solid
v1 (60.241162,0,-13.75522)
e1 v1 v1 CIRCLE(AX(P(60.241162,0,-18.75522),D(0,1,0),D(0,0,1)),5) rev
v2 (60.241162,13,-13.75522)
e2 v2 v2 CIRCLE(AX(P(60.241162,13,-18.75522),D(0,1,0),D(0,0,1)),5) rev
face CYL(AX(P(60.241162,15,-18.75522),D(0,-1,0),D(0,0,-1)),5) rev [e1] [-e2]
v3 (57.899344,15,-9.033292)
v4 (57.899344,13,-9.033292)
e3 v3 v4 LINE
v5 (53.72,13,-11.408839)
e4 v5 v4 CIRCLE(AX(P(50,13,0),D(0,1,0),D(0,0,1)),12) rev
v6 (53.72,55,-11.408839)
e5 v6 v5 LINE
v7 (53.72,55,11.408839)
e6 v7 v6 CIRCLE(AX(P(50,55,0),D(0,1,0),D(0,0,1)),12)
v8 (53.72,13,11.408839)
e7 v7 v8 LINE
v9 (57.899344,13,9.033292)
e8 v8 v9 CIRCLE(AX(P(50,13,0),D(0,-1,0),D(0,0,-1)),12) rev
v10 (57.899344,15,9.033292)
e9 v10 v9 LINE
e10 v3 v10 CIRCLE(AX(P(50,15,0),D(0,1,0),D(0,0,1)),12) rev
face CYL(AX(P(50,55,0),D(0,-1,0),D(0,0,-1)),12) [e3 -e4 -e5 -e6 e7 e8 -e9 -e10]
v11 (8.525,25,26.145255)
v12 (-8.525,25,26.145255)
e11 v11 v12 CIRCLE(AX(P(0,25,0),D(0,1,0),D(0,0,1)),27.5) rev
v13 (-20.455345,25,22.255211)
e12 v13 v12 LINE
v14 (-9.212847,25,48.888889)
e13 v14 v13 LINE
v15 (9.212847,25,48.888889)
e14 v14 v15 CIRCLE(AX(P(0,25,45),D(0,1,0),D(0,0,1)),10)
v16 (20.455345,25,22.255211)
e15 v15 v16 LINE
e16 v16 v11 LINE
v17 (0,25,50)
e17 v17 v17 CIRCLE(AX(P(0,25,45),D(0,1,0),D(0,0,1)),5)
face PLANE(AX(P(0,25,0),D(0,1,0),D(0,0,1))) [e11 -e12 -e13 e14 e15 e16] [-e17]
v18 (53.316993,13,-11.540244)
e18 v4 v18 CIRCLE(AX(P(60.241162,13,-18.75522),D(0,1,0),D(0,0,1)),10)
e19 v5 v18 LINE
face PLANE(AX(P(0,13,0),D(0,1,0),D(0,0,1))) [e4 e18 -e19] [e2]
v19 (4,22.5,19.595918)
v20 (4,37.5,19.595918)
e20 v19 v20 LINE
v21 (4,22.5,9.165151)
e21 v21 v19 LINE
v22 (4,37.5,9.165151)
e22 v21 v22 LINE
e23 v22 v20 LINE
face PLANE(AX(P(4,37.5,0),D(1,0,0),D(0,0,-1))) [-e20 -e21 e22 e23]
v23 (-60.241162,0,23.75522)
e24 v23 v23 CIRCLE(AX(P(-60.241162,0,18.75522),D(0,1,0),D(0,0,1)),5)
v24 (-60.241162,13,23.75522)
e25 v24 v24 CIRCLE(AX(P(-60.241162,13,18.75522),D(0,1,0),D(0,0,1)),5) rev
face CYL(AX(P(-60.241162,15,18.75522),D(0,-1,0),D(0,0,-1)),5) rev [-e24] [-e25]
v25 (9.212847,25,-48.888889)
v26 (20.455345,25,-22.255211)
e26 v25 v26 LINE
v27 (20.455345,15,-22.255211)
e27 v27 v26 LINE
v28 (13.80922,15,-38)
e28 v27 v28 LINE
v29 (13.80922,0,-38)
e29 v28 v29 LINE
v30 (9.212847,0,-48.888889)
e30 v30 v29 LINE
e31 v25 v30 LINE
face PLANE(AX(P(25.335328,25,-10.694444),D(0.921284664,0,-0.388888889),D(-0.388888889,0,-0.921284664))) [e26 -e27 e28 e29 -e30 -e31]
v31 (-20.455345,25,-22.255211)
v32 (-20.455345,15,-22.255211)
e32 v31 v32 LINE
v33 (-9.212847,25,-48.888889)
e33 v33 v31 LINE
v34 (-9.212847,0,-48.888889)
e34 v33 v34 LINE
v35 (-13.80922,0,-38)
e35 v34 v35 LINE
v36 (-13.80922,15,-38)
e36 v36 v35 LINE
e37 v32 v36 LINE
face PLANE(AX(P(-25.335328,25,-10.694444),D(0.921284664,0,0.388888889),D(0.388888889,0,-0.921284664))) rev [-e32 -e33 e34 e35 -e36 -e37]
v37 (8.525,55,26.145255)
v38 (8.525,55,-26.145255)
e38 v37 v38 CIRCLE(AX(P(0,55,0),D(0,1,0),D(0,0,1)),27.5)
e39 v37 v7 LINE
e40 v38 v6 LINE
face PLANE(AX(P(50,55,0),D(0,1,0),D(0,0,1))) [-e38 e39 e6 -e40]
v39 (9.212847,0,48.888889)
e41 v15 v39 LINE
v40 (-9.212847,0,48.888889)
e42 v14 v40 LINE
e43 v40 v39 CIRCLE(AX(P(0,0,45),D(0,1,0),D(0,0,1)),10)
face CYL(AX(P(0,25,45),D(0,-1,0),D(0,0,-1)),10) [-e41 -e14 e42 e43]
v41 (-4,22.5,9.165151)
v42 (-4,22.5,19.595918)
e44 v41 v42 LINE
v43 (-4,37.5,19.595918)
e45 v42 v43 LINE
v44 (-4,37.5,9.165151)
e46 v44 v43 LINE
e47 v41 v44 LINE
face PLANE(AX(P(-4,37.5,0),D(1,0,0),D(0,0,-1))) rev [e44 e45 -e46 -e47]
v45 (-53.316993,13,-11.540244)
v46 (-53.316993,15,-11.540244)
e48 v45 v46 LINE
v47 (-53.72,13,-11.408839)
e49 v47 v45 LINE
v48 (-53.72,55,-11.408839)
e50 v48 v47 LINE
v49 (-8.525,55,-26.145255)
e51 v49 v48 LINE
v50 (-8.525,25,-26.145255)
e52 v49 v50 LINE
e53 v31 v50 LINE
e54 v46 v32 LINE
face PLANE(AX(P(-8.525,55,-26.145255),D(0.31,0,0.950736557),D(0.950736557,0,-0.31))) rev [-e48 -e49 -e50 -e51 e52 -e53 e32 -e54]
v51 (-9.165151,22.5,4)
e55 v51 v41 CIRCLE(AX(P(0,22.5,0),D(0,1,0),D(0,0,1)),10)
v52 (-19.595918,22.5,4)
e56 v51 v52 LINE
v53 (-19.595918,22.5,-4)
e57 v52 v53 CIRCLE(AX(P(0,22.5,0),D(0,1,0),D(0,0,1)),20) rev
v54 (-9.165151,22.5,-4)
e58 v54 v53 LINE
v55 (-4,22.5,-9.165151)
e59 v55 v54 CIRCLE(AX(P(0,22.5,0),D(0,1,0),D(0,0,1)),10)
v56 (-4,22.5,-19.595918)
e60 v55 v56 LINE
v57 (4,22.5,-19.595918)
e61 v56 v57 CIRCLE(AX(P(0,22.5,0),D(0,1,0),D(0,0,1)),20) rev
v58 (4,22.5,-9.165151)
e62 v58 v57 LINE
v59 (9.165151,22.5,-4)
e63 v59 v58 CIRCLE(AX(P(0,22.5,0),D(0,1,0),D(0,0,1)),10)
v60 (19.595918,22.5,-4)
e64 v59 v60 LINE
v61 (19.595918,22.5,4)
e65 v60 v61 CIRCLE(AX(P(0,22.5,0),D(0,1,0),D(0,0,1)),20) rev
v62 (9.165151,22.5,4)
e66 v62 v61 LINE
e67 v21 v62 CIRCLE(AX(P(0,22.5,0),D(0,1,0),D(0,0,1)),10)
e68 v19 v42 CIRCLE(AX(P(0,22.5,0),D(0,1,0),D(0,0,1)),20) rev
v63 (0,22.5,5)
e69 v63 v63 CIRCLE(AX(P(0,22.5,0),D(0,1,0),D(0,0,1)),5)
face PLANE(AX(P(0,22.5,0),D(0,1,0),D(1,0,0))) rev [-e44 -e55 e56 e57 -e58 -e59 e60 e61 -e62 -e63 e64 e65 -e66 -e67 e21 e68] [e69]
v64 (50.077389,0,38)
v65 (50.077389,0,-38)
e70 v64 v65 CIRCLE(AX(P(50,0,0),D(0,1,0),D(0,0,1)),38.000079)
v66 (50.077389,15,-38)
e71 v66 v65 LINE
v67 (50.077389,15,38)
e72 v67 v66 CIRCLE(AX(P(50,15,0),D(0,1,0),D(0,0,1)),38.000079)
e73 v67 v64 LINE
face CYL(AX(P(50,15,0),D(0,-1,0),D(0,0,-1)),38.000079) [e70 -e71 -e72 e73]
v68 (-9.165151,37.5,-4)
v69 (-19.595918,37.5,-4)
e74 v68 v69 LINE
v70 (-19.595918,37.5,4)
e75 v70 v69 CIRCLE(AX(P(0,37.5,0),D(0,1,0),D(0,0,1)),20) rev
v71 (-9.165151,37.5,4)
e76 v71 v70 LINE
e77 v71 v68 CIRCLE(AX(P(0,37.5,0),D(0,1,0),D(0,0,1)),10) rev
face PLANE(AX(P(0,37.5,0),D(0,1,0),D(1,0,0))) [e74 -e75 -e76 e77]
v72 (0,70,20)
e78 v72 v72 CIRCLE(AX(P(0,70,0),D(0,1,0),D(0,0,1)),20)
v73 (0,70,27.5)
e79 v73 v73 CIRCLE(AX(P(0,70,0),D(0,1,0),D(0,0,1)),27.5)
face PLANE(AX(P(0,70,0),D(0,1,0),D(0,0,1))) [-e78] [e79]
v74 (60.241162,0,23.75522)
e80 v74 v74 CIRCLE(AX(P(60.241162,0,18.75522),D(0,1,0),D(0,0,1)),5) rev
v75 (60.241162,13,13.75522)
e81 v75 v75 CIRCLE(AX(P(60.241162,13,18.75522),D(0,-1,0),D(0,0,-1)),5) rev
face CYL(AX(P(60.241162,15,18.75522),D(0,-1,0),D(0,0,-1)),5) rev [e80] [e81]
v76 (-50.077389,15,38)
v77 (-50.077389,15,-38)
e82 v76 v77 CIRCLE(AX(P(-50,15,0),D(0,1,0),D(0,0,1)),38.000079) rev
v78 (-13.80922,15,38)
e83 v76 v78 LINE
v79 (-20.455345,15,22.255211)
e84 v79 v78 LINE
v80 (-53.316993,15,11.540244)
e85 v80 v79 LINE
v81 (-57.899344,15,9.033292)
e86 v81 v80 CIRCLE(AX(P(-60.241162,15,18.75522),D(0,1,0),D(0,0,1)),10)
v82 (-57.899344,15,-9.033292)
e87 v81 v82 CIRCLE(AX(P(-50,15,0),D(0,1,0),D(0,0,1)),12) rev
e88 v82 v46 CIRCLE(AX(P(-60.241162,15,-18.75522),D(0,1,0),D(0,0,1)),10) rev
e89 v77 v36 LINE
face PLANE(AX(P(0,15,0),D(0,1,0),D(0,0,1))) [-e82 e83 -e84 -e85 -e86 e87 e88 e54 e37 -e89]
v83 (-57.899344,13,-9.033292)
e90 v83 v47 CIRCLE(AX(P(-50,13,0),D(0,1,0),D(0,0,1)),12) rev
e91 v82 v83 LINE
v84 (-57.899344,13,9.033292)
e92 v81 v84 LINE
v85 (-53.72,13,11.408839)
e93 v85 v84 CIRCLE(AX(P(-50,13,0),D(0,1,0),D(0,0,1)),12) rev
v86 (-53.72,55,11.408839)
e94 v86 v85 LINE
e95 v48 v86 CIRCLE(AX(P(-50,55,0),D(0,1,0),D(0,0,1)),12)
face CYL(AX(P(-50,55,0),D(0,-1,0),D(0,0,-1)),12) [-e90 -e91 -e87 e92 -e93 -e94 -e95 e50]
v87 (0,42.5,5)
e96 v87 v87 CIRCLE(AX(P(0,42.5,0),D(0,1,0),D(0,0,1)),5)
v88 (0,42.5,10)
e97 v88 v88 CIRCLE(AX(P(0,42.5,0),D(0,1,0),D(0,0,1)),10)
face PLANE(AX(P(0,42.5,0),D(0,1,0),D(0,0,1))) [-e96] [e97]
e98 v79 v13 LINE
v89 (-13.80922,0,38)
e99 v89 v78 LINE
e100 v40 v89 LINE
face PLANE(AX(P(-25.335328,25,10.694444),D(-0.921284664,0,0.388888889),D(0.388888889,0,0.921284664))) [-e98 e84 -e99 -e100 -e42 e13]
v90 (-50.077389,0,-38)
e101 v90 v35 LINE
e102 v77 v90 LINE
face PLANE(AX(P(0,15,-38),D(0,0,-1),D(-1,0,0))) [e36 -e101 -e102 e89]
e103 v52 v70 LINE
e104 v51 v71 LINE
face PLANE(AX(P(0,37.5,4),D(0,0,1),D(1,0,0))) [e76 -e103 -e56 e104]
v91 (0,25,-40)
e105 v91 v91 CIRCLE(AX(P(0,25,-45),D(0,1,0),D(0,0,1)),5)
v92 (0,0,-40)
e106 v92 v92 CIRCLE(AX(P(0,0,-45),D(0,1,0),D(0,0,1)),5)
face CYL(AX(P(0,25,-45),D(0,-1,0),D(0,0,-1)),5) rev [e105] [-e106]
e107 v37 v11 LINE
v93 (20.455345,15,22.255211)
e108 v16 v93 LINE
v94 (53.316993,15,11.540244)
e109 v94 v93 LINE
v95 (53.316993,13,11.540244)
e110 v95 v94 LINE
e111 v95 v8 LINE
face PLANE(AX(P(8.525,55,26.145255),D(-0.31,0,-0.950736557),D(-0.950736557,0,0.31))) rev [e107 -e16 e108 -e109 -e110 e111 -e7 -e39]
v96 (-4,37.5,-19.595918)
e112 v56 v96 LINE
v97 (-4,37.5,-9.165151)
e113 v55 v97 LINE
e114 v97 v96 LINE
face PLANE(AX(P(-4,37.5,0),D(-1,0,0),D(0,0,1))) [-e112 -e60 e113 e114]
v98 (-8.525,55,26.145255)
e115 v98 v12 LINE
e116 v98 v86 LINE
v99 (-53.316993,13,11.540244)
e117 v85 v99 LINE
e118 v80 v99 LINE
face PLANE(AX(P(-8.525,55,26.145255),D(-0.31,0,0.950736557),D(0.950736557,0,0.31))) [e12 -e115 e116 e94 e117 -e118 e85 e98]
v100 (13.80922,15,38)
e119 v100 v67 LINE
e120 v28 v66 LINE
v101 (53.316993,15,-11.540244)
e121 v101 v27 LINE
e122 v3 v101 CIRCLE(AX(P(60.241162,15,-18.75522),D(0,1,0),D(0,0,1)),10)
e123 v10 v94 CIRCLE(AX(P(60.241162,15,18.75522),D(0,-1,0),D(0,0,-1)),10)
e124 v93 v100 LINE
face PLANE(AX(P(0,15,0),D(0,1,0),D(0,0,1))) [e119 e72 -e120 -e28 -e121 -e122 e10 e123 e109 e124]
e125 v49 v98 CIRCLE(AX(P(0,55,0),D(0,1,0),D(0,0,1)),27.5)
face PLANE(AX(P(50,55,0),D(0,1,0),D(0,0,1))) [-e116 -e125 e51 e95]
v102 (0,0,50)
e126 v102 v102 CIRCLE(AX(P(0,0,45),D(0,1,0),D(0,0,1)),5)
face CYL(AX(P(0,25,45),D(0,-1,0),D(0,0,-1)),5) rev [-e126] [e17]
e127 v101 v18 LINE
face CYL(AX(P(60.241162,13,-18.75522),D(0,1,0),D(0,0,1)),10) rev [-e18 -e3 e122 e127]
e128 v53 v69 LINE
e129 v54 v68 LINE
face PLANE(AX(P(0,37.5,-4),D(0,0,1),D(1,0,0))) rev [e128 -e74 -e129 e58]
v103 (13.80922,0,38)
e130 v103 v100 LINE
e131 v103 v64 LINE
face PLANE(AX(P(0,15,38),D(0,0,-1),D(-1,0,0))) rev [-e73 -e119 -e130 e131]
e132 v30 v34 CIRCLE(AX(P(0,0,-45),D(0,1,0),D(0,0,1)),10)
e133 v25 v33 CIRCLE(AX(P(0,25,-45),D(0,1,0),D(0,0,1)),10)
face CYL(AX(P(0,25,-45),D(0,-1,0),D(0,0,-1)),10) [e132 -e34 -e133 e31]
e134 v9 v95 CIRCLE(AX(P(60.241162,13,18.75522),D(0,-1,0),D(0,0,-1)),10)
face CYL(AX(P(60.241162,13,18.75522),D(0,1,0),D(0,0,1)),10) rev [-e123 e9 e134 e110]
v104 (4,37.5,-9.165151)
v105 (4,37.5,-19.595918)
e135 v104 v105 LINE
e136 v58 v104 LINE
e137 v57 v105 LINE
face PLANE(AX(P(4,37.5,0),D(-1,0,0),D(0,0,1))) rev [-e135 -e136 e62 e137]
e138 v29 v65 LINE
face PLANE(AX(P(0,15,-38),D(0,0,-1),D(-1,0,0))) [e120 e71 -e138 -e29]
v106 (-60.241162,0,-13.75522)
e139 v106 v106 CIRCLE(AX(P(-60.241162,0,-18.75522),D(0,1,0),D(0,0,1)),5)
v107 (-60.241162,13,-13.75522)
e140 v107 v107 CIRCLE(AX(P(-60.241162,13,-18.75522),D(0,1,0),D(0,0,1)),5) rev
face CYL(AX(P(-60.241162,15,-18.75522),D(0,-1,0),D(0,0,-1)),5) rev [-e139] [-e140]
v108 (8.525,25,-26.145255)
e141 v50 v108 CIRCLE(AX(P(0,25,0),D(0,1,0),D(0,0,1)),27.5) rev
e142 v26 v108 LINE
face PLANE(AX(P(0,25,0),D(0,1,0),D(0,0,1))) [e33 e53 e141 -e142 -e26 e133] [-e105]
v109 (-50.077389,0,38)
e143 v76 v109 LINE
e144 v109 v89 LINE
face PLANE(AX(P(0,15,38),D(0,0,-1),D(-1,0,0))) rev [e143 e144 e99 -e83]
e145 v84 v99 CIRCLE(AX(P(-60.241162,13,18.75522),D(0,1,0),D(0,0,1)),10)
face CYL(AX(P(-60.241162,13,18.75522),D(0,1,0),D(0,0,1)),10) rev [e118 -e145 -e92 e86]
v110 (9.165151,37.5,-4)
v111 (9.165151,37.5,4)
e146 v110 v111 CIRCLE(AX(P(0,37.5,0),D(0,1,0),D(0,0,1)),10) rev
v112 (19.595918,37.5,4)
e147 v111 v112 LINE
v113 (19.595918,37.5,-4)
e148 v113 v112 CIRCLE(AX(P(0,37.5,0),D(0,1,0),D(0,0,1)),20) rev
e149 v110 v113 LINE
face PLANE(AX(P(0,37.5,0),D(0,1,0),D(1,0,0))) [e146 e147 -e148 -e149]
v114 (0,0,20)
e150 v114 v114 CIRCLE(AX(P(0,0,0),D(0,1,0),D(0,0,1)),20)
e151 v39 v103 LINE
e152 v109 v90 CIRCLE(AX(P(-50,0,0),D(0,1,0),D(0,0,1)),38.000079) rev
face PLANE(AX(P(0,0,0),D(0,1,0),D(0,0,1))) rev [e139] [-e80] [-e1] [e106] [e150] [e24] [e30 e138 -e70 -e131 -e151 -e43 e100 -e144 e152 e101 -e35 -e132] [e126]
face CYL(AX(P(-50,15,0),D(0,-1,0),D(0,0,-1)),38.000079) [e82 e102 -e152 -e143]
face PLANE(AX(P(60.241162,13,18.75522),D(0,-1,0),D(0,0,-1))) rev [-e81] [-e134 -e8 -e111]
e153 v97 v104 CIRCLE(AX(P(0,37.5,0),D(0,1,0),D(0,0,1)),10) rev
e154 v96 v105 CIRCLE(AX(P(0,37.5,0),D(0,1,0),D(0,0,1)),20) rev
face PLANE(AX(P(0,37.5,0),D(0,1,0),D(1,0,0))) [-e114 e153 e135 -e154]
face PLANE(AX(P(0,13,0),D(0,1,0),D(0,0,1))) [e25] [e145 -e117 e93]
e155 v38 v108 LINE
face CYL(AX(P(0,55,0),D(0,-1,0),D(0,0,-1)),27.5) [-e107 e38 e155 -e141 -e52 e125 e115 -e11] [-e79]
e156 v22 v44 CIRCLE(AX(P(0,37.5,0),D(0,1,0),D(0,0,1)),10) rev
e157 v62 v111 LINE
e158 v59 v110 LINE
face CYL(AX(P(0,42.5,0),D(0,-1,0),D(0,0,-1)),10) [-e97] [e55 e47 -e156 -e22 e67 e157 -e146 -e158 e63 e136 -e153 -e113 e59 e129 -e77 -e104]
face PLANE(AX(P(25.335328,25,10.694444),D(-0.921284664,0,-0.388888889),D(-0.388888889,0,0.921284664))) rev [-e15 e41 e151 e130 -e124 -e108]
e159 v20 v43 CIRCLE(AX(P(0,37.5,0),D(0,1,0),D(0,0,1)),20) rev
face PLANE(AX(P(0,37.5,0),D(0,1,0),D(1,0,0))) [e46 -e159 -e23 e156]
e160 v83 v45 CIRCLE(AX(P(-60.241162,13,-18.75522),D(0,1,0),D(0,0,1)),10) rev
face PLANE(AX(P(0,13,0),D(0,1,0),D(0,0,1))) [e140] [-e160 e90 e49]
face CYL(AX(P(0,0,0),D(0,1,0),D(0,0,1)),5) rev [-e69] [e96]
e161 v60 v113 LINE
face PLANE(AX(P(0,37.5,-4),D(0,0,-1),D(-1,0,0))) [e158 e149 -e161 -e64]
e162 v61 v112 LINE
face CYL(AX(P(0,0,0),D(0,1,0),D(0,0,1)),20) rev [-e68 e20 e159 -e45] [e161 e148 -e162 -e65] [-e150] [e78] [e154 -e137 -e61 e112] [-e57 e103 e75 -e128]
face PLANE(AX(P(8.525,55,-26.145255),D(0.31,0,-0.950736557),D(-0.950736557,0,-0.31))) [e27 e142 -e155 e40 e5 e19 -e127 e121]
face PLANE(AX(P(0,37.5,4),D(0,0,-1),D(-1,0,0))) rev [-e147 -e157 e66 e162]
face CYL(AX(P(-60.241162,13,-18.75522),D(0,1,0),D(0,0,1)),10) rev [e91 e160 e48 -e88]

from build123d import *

# Parameters (mm, degrees)
SKETCH1_R           = 5
BOSS_EXTRUDE2_DEPTH = 15
CUT_EXTRUDE1_START  = -2
SKETCH2_R           = 10
SKETCH2_R_2         = 5
CUT_EXTRUDE1_DEPTH  = 2
BOSS_EXTRUDE3_START = -15
SKETCH3_R           = 5
BOSS_EXTRUDE3_DEPTH = 25
BOSS_EXTRUDE4_DEPTH = 55
SKETCH5_R           = 27.5
BOSS_EXTRUDE5_DEPTH = 15
SKETCH6_R           = 20
CUT_EXTRUDE2_DEPTH  = 126.175931669
EXTRUDE_THIN1_START = 22.5
EXTRUDE_THIN1_DEPTH = 15
BOSS_EXTRUDE6_START = -15
SKETCH8_R           = 10
BOSS_EXTRUDE6_DEPTH = 20
SKETCH9_R           = 5
CUT_EXTRUDE3_DEPTH  = 113.139483989


with BuildPart() as part:
    # Sketch1 → Boss-Extrude2 (new body)
    with BuildSketch(Plane(origin=(0, 0, 0), x_dir=(1, 0, 0), z_dir=(0, 1, 0))):
        with BuildLine():
            Line((-50.077388597, -38), (50.077388597, -38))
            ThreePointArc((50.077388597, -38), (88.000078802, 0), (50.077388597, 38))
            Line((50.077388597, 38), (-50.077388597, 38))
            ThreePointArc((-50.077388597, 38), (-88.000078802, 0), (-50.077388597, -38))
        make_face()
        with Locations(Location((-60.241162363, 18.755220238, 0), (0, 0, 270))):
            Circle(SKETCH1_R, mode=Mode.SUBTRACT)
        with Locations(Location((-60.241162363, -18.755220238, 0), (0, 0, 270))):
            Circle(SKETCH1_R, mode=Mode.SUBTRACT)
        with Locations(Location((60.241162363, -18.755220238, 0), (0, 0, 270))):
            Circle(SKETCH1_R, mode=Mode.SUBTRACT)
        with Locations(Location((60.241162363, 18.755220238, 0), (0, 0, 270))):
            Circle(SKETCH1_R, mode=Mode.SUBTRACT)
    extrude(amount=BOSS_EXTRUDE2_DEPTH)

    # Sketch2 → Cut-Extrude1 (cut)
    # profile 1 of 4: a face of its own
    with BuildSketch(Plane(origin=(0, 15, 0), x_dir=(1, 0, 0), z_dir=(0, 1, 0)).offset(CUT_EXTRUDE1_START)):
        with Locations(Location((-60.241162363, -18.755220238, 0), (0, 0, 270))):
            Circle(SKETCH2_R)
        with Locations(Location((-60.241162363, -18.755220238, 0), (0, 0, 270))):
            Circle(SKETCH2_R_2, mode=Mode.SUBTRACT)
    # profile 2 of 4: a face of its own
    with BuildSketch(Plane(origin=(0, 15, 0), x_dir=(1, 0, 0), z_dir=(0, 1, 0)).offset(CUT_EXTRUDE1_START)):
        with Locations(Location((-60.241162363, 18.755220238, 0), (0, 0, 270))):
            Circle(SKETCH2_R)
        with Locations(Location((-60.241162363, 18.755220238, 0), (0, 0, 270))):
            Circle(SKETCH2_R_2, mode=Mode.SUBTRACT)
    # profile 3 of 4: a face of its own
    with BuildSketch(Plane(origin=(0, 15, 0), x_dir=(1, 0, 0), z_dir=(0, 1, 0)).offset(CUT_EXTRUDE1_START)):
        with Locations(Location((60.241162363, 18.755220238, 0), (0, 0, 270))):
            Circle(SKETCH2_R)
        with Locations(Location((60.241162363, 18.755220238, 0), (0, 0, 270))):
            Circle(SKETCH2_R_2, mode=Mode.SUBTRACT)
    # profile 4 of 4: a face of its own
    with BuildSketch(Plane(origin=(0, 15, 0), x_dir=(1, 0, 0), z_dir=(0, 1, 0)).offset(CUT_EXTRUDE1_START)):
        with Locations(Location((60.241162363, -18.755220238, 0), (0, 0, 90))):
            Circle(SKETCH2_R)
    extrude(amount=CUT_EXTRUDE1_DEPTH, mode=Mode.SUBTRACT)

    # Sketch3 → Boss-Extrude3 (add)
    with BuildSketch(Plane(origin=(0, 15, 0), x_dir=(1, 0, 0), z_dir=(0, 1, 0)).offset(BOSS_EXTRUDE3_START)):
        with BuildLine():
            Line((-9.21284664, 48.888888889), (-25.33532826, 10.694444444))
            ThreePointArc((-25.33532826, 10.694444444), (-27.5, 0), (-25.33532826, -10.694444444))
            Line((-25.33532826, -10.694444444), (-9.21284664, -48.888888889))
            ThreePointArc((-9.21284664, -48.888888889), (0, -55), (9.21284664, -48.888888889))
            Line((9.21284664, -48.888888889), (25.33532826, -10.694444444))
            ThreePointArc((25.33532826, -10.694444444), (27.5, 0), (25.33532826, 10.694444444))
            Line((25.33532826, 10.694444444), (9.21284664, 48.888888889))
            ThreePointArc((9.21284664, 48.888888889), (0, 55), (-9.21284664, 48.888888889))
        make_face()
        with Locations(Location((0, 45, 0), (0, 0, 270))):
            Circle(SKETCH3_R, mode=Mode.SUBTRACT)
        with Locations(Location((0, -45, 0), (0, 0, 270))):
            Circle(SKETCH3_R, mode=Mode.SUBTRACT)
    extrude(amount=BOSS_EXTRUDE3_DEPTH)

    # Sketch4 → Boss-Extrude4 (add)
    with BuildSketch(Plane(origin=(0, 0, 0), x_dir=(1, 0, 0), z_dir=(0, 1, 0))):
        with BuildLine():
            Line((-53.72, 11.408838679), (-8.525, 26.145255306))
            ThreePointArc((-8.525, 26.145255306), (0, 27.5), (8.525, 26.145255306))
            Line((8.525, 26.145255306), (53.72, 11.408838679))
            ThreePointArc((53.72, 11.408838679), (62, 0), (53.72, -11.408838679))
            Line((53.72, -11.408838679), (8.525, -26.145255306))
            ThreePointArc((8.525, -26.145255306), (0, -27.5), (-8.525, -26.145255306))
            Line((-8.525, -26.145255306), (-53.72, -11.408838679))
            ThreePointArc((-53.72, -11.408838679), (-62, 0), (-53.72, 11.408838679))
        make_face()
    extrude(amount=BOSS_EXTRUDE4_DEPTH)

    # Sketch5 → Boss-Extrude5 (add)
    with BuildSketch(Plane(origin=(0, 55, 0), x_dir=(1, 0, 0), z_dir=(0, 1, 0))):
        with Locations(Location((0, 0, 0), (0, 0, 108.059230491))):
            Circle(SKETCH5_R)
    extrude(amount=BOSS_EXTRUDE5_DEPTH)

    # Sketch6 → Cut-Extrude2 (cut, through all)
    with BuildSketch(Plane(origin=(0, 70, 0), x_dir=(1, 0, 0), z_dir=(0, 1, 0))):
        with Locations(Location((0, 0, 0), (0, 0, 270))):
            Circle(SKETCH6_R)
    extrude(amount=-CUT_EXTRUDE2_DEPTH, mode=Mode.SUBTRACT)

    # Extrude-Thin1: read off the stored shape, not the designer's step
    # Extrude-Thin1 outline → Extrude-Thin1 (add)
    with BuildSketch(Plane(origin=(0, 0, 0), x_dir=(1, 0, 0), z_dir=(0, 1, 0)).offset(EXTRUDE_THIN1_START)):
        with BuildLine():
            Line((4, 4), (4, 19.595917942))
            ThreePointArc((4, 19.595917942), (0, 20), (-4, 19.595917942))
            Line((-4, 19.595917942), (-4, 4))
            Line((-4, 4), (-19.595917942, 4))
            ThreePointArc((-19.595917942, 4), (-20, 0), (-19.595917942, -4))
            Line((-19.595917942, -4), (-4, -4))
            Line((-4, -4), (-4, -19.595917942))
            ThreePointArc((-4, -19.595917942), (0, -20), (4, -19.595917942))
            Line((4, -19.595917942), (4, -4))
            Line((4, -4), (19.595917942, -4))
            ThreePointArc((19.595917942, -4), (20, 0), (19.595917942, 4))
            Line((19.595917942, 4), (4, 4))
        make_face()
    extrude(amount=EXTRUDE_THIN1_DEPTH)

    # Sketch8 → Boss-Extrude6 (add)
    with BuildSketch(Plane(origin=(0, 37.5, 0), x_dir=(1, 0, 0), z_dir=(0, 1, 0)).offset(BOSS_EXTRUDE6_START)):
        with Locations(Location((0, 0, 0), (0, 0, 66.421821522))):
            Circle(SKETCH8_R)
    extrude(amount=BOSS_EXTRUDE6_DEPTH)

    # Sketch9 → Cut-Extrude3 (cut, through all)
    with BuildSketch(Plane(origin=(0, 42.5, 0), x_dir=(1, 0, 0), z_dir=(0, 1, 0))):
        with Locations(Location((0, 0, 0), (0, 0, 270))):
            Circle(SKETCH9_R)
    extrude(amount=-CUT_EXTRUDE3_DEPTH, mode=Mode.SUBTRACT)


solid = part.part
